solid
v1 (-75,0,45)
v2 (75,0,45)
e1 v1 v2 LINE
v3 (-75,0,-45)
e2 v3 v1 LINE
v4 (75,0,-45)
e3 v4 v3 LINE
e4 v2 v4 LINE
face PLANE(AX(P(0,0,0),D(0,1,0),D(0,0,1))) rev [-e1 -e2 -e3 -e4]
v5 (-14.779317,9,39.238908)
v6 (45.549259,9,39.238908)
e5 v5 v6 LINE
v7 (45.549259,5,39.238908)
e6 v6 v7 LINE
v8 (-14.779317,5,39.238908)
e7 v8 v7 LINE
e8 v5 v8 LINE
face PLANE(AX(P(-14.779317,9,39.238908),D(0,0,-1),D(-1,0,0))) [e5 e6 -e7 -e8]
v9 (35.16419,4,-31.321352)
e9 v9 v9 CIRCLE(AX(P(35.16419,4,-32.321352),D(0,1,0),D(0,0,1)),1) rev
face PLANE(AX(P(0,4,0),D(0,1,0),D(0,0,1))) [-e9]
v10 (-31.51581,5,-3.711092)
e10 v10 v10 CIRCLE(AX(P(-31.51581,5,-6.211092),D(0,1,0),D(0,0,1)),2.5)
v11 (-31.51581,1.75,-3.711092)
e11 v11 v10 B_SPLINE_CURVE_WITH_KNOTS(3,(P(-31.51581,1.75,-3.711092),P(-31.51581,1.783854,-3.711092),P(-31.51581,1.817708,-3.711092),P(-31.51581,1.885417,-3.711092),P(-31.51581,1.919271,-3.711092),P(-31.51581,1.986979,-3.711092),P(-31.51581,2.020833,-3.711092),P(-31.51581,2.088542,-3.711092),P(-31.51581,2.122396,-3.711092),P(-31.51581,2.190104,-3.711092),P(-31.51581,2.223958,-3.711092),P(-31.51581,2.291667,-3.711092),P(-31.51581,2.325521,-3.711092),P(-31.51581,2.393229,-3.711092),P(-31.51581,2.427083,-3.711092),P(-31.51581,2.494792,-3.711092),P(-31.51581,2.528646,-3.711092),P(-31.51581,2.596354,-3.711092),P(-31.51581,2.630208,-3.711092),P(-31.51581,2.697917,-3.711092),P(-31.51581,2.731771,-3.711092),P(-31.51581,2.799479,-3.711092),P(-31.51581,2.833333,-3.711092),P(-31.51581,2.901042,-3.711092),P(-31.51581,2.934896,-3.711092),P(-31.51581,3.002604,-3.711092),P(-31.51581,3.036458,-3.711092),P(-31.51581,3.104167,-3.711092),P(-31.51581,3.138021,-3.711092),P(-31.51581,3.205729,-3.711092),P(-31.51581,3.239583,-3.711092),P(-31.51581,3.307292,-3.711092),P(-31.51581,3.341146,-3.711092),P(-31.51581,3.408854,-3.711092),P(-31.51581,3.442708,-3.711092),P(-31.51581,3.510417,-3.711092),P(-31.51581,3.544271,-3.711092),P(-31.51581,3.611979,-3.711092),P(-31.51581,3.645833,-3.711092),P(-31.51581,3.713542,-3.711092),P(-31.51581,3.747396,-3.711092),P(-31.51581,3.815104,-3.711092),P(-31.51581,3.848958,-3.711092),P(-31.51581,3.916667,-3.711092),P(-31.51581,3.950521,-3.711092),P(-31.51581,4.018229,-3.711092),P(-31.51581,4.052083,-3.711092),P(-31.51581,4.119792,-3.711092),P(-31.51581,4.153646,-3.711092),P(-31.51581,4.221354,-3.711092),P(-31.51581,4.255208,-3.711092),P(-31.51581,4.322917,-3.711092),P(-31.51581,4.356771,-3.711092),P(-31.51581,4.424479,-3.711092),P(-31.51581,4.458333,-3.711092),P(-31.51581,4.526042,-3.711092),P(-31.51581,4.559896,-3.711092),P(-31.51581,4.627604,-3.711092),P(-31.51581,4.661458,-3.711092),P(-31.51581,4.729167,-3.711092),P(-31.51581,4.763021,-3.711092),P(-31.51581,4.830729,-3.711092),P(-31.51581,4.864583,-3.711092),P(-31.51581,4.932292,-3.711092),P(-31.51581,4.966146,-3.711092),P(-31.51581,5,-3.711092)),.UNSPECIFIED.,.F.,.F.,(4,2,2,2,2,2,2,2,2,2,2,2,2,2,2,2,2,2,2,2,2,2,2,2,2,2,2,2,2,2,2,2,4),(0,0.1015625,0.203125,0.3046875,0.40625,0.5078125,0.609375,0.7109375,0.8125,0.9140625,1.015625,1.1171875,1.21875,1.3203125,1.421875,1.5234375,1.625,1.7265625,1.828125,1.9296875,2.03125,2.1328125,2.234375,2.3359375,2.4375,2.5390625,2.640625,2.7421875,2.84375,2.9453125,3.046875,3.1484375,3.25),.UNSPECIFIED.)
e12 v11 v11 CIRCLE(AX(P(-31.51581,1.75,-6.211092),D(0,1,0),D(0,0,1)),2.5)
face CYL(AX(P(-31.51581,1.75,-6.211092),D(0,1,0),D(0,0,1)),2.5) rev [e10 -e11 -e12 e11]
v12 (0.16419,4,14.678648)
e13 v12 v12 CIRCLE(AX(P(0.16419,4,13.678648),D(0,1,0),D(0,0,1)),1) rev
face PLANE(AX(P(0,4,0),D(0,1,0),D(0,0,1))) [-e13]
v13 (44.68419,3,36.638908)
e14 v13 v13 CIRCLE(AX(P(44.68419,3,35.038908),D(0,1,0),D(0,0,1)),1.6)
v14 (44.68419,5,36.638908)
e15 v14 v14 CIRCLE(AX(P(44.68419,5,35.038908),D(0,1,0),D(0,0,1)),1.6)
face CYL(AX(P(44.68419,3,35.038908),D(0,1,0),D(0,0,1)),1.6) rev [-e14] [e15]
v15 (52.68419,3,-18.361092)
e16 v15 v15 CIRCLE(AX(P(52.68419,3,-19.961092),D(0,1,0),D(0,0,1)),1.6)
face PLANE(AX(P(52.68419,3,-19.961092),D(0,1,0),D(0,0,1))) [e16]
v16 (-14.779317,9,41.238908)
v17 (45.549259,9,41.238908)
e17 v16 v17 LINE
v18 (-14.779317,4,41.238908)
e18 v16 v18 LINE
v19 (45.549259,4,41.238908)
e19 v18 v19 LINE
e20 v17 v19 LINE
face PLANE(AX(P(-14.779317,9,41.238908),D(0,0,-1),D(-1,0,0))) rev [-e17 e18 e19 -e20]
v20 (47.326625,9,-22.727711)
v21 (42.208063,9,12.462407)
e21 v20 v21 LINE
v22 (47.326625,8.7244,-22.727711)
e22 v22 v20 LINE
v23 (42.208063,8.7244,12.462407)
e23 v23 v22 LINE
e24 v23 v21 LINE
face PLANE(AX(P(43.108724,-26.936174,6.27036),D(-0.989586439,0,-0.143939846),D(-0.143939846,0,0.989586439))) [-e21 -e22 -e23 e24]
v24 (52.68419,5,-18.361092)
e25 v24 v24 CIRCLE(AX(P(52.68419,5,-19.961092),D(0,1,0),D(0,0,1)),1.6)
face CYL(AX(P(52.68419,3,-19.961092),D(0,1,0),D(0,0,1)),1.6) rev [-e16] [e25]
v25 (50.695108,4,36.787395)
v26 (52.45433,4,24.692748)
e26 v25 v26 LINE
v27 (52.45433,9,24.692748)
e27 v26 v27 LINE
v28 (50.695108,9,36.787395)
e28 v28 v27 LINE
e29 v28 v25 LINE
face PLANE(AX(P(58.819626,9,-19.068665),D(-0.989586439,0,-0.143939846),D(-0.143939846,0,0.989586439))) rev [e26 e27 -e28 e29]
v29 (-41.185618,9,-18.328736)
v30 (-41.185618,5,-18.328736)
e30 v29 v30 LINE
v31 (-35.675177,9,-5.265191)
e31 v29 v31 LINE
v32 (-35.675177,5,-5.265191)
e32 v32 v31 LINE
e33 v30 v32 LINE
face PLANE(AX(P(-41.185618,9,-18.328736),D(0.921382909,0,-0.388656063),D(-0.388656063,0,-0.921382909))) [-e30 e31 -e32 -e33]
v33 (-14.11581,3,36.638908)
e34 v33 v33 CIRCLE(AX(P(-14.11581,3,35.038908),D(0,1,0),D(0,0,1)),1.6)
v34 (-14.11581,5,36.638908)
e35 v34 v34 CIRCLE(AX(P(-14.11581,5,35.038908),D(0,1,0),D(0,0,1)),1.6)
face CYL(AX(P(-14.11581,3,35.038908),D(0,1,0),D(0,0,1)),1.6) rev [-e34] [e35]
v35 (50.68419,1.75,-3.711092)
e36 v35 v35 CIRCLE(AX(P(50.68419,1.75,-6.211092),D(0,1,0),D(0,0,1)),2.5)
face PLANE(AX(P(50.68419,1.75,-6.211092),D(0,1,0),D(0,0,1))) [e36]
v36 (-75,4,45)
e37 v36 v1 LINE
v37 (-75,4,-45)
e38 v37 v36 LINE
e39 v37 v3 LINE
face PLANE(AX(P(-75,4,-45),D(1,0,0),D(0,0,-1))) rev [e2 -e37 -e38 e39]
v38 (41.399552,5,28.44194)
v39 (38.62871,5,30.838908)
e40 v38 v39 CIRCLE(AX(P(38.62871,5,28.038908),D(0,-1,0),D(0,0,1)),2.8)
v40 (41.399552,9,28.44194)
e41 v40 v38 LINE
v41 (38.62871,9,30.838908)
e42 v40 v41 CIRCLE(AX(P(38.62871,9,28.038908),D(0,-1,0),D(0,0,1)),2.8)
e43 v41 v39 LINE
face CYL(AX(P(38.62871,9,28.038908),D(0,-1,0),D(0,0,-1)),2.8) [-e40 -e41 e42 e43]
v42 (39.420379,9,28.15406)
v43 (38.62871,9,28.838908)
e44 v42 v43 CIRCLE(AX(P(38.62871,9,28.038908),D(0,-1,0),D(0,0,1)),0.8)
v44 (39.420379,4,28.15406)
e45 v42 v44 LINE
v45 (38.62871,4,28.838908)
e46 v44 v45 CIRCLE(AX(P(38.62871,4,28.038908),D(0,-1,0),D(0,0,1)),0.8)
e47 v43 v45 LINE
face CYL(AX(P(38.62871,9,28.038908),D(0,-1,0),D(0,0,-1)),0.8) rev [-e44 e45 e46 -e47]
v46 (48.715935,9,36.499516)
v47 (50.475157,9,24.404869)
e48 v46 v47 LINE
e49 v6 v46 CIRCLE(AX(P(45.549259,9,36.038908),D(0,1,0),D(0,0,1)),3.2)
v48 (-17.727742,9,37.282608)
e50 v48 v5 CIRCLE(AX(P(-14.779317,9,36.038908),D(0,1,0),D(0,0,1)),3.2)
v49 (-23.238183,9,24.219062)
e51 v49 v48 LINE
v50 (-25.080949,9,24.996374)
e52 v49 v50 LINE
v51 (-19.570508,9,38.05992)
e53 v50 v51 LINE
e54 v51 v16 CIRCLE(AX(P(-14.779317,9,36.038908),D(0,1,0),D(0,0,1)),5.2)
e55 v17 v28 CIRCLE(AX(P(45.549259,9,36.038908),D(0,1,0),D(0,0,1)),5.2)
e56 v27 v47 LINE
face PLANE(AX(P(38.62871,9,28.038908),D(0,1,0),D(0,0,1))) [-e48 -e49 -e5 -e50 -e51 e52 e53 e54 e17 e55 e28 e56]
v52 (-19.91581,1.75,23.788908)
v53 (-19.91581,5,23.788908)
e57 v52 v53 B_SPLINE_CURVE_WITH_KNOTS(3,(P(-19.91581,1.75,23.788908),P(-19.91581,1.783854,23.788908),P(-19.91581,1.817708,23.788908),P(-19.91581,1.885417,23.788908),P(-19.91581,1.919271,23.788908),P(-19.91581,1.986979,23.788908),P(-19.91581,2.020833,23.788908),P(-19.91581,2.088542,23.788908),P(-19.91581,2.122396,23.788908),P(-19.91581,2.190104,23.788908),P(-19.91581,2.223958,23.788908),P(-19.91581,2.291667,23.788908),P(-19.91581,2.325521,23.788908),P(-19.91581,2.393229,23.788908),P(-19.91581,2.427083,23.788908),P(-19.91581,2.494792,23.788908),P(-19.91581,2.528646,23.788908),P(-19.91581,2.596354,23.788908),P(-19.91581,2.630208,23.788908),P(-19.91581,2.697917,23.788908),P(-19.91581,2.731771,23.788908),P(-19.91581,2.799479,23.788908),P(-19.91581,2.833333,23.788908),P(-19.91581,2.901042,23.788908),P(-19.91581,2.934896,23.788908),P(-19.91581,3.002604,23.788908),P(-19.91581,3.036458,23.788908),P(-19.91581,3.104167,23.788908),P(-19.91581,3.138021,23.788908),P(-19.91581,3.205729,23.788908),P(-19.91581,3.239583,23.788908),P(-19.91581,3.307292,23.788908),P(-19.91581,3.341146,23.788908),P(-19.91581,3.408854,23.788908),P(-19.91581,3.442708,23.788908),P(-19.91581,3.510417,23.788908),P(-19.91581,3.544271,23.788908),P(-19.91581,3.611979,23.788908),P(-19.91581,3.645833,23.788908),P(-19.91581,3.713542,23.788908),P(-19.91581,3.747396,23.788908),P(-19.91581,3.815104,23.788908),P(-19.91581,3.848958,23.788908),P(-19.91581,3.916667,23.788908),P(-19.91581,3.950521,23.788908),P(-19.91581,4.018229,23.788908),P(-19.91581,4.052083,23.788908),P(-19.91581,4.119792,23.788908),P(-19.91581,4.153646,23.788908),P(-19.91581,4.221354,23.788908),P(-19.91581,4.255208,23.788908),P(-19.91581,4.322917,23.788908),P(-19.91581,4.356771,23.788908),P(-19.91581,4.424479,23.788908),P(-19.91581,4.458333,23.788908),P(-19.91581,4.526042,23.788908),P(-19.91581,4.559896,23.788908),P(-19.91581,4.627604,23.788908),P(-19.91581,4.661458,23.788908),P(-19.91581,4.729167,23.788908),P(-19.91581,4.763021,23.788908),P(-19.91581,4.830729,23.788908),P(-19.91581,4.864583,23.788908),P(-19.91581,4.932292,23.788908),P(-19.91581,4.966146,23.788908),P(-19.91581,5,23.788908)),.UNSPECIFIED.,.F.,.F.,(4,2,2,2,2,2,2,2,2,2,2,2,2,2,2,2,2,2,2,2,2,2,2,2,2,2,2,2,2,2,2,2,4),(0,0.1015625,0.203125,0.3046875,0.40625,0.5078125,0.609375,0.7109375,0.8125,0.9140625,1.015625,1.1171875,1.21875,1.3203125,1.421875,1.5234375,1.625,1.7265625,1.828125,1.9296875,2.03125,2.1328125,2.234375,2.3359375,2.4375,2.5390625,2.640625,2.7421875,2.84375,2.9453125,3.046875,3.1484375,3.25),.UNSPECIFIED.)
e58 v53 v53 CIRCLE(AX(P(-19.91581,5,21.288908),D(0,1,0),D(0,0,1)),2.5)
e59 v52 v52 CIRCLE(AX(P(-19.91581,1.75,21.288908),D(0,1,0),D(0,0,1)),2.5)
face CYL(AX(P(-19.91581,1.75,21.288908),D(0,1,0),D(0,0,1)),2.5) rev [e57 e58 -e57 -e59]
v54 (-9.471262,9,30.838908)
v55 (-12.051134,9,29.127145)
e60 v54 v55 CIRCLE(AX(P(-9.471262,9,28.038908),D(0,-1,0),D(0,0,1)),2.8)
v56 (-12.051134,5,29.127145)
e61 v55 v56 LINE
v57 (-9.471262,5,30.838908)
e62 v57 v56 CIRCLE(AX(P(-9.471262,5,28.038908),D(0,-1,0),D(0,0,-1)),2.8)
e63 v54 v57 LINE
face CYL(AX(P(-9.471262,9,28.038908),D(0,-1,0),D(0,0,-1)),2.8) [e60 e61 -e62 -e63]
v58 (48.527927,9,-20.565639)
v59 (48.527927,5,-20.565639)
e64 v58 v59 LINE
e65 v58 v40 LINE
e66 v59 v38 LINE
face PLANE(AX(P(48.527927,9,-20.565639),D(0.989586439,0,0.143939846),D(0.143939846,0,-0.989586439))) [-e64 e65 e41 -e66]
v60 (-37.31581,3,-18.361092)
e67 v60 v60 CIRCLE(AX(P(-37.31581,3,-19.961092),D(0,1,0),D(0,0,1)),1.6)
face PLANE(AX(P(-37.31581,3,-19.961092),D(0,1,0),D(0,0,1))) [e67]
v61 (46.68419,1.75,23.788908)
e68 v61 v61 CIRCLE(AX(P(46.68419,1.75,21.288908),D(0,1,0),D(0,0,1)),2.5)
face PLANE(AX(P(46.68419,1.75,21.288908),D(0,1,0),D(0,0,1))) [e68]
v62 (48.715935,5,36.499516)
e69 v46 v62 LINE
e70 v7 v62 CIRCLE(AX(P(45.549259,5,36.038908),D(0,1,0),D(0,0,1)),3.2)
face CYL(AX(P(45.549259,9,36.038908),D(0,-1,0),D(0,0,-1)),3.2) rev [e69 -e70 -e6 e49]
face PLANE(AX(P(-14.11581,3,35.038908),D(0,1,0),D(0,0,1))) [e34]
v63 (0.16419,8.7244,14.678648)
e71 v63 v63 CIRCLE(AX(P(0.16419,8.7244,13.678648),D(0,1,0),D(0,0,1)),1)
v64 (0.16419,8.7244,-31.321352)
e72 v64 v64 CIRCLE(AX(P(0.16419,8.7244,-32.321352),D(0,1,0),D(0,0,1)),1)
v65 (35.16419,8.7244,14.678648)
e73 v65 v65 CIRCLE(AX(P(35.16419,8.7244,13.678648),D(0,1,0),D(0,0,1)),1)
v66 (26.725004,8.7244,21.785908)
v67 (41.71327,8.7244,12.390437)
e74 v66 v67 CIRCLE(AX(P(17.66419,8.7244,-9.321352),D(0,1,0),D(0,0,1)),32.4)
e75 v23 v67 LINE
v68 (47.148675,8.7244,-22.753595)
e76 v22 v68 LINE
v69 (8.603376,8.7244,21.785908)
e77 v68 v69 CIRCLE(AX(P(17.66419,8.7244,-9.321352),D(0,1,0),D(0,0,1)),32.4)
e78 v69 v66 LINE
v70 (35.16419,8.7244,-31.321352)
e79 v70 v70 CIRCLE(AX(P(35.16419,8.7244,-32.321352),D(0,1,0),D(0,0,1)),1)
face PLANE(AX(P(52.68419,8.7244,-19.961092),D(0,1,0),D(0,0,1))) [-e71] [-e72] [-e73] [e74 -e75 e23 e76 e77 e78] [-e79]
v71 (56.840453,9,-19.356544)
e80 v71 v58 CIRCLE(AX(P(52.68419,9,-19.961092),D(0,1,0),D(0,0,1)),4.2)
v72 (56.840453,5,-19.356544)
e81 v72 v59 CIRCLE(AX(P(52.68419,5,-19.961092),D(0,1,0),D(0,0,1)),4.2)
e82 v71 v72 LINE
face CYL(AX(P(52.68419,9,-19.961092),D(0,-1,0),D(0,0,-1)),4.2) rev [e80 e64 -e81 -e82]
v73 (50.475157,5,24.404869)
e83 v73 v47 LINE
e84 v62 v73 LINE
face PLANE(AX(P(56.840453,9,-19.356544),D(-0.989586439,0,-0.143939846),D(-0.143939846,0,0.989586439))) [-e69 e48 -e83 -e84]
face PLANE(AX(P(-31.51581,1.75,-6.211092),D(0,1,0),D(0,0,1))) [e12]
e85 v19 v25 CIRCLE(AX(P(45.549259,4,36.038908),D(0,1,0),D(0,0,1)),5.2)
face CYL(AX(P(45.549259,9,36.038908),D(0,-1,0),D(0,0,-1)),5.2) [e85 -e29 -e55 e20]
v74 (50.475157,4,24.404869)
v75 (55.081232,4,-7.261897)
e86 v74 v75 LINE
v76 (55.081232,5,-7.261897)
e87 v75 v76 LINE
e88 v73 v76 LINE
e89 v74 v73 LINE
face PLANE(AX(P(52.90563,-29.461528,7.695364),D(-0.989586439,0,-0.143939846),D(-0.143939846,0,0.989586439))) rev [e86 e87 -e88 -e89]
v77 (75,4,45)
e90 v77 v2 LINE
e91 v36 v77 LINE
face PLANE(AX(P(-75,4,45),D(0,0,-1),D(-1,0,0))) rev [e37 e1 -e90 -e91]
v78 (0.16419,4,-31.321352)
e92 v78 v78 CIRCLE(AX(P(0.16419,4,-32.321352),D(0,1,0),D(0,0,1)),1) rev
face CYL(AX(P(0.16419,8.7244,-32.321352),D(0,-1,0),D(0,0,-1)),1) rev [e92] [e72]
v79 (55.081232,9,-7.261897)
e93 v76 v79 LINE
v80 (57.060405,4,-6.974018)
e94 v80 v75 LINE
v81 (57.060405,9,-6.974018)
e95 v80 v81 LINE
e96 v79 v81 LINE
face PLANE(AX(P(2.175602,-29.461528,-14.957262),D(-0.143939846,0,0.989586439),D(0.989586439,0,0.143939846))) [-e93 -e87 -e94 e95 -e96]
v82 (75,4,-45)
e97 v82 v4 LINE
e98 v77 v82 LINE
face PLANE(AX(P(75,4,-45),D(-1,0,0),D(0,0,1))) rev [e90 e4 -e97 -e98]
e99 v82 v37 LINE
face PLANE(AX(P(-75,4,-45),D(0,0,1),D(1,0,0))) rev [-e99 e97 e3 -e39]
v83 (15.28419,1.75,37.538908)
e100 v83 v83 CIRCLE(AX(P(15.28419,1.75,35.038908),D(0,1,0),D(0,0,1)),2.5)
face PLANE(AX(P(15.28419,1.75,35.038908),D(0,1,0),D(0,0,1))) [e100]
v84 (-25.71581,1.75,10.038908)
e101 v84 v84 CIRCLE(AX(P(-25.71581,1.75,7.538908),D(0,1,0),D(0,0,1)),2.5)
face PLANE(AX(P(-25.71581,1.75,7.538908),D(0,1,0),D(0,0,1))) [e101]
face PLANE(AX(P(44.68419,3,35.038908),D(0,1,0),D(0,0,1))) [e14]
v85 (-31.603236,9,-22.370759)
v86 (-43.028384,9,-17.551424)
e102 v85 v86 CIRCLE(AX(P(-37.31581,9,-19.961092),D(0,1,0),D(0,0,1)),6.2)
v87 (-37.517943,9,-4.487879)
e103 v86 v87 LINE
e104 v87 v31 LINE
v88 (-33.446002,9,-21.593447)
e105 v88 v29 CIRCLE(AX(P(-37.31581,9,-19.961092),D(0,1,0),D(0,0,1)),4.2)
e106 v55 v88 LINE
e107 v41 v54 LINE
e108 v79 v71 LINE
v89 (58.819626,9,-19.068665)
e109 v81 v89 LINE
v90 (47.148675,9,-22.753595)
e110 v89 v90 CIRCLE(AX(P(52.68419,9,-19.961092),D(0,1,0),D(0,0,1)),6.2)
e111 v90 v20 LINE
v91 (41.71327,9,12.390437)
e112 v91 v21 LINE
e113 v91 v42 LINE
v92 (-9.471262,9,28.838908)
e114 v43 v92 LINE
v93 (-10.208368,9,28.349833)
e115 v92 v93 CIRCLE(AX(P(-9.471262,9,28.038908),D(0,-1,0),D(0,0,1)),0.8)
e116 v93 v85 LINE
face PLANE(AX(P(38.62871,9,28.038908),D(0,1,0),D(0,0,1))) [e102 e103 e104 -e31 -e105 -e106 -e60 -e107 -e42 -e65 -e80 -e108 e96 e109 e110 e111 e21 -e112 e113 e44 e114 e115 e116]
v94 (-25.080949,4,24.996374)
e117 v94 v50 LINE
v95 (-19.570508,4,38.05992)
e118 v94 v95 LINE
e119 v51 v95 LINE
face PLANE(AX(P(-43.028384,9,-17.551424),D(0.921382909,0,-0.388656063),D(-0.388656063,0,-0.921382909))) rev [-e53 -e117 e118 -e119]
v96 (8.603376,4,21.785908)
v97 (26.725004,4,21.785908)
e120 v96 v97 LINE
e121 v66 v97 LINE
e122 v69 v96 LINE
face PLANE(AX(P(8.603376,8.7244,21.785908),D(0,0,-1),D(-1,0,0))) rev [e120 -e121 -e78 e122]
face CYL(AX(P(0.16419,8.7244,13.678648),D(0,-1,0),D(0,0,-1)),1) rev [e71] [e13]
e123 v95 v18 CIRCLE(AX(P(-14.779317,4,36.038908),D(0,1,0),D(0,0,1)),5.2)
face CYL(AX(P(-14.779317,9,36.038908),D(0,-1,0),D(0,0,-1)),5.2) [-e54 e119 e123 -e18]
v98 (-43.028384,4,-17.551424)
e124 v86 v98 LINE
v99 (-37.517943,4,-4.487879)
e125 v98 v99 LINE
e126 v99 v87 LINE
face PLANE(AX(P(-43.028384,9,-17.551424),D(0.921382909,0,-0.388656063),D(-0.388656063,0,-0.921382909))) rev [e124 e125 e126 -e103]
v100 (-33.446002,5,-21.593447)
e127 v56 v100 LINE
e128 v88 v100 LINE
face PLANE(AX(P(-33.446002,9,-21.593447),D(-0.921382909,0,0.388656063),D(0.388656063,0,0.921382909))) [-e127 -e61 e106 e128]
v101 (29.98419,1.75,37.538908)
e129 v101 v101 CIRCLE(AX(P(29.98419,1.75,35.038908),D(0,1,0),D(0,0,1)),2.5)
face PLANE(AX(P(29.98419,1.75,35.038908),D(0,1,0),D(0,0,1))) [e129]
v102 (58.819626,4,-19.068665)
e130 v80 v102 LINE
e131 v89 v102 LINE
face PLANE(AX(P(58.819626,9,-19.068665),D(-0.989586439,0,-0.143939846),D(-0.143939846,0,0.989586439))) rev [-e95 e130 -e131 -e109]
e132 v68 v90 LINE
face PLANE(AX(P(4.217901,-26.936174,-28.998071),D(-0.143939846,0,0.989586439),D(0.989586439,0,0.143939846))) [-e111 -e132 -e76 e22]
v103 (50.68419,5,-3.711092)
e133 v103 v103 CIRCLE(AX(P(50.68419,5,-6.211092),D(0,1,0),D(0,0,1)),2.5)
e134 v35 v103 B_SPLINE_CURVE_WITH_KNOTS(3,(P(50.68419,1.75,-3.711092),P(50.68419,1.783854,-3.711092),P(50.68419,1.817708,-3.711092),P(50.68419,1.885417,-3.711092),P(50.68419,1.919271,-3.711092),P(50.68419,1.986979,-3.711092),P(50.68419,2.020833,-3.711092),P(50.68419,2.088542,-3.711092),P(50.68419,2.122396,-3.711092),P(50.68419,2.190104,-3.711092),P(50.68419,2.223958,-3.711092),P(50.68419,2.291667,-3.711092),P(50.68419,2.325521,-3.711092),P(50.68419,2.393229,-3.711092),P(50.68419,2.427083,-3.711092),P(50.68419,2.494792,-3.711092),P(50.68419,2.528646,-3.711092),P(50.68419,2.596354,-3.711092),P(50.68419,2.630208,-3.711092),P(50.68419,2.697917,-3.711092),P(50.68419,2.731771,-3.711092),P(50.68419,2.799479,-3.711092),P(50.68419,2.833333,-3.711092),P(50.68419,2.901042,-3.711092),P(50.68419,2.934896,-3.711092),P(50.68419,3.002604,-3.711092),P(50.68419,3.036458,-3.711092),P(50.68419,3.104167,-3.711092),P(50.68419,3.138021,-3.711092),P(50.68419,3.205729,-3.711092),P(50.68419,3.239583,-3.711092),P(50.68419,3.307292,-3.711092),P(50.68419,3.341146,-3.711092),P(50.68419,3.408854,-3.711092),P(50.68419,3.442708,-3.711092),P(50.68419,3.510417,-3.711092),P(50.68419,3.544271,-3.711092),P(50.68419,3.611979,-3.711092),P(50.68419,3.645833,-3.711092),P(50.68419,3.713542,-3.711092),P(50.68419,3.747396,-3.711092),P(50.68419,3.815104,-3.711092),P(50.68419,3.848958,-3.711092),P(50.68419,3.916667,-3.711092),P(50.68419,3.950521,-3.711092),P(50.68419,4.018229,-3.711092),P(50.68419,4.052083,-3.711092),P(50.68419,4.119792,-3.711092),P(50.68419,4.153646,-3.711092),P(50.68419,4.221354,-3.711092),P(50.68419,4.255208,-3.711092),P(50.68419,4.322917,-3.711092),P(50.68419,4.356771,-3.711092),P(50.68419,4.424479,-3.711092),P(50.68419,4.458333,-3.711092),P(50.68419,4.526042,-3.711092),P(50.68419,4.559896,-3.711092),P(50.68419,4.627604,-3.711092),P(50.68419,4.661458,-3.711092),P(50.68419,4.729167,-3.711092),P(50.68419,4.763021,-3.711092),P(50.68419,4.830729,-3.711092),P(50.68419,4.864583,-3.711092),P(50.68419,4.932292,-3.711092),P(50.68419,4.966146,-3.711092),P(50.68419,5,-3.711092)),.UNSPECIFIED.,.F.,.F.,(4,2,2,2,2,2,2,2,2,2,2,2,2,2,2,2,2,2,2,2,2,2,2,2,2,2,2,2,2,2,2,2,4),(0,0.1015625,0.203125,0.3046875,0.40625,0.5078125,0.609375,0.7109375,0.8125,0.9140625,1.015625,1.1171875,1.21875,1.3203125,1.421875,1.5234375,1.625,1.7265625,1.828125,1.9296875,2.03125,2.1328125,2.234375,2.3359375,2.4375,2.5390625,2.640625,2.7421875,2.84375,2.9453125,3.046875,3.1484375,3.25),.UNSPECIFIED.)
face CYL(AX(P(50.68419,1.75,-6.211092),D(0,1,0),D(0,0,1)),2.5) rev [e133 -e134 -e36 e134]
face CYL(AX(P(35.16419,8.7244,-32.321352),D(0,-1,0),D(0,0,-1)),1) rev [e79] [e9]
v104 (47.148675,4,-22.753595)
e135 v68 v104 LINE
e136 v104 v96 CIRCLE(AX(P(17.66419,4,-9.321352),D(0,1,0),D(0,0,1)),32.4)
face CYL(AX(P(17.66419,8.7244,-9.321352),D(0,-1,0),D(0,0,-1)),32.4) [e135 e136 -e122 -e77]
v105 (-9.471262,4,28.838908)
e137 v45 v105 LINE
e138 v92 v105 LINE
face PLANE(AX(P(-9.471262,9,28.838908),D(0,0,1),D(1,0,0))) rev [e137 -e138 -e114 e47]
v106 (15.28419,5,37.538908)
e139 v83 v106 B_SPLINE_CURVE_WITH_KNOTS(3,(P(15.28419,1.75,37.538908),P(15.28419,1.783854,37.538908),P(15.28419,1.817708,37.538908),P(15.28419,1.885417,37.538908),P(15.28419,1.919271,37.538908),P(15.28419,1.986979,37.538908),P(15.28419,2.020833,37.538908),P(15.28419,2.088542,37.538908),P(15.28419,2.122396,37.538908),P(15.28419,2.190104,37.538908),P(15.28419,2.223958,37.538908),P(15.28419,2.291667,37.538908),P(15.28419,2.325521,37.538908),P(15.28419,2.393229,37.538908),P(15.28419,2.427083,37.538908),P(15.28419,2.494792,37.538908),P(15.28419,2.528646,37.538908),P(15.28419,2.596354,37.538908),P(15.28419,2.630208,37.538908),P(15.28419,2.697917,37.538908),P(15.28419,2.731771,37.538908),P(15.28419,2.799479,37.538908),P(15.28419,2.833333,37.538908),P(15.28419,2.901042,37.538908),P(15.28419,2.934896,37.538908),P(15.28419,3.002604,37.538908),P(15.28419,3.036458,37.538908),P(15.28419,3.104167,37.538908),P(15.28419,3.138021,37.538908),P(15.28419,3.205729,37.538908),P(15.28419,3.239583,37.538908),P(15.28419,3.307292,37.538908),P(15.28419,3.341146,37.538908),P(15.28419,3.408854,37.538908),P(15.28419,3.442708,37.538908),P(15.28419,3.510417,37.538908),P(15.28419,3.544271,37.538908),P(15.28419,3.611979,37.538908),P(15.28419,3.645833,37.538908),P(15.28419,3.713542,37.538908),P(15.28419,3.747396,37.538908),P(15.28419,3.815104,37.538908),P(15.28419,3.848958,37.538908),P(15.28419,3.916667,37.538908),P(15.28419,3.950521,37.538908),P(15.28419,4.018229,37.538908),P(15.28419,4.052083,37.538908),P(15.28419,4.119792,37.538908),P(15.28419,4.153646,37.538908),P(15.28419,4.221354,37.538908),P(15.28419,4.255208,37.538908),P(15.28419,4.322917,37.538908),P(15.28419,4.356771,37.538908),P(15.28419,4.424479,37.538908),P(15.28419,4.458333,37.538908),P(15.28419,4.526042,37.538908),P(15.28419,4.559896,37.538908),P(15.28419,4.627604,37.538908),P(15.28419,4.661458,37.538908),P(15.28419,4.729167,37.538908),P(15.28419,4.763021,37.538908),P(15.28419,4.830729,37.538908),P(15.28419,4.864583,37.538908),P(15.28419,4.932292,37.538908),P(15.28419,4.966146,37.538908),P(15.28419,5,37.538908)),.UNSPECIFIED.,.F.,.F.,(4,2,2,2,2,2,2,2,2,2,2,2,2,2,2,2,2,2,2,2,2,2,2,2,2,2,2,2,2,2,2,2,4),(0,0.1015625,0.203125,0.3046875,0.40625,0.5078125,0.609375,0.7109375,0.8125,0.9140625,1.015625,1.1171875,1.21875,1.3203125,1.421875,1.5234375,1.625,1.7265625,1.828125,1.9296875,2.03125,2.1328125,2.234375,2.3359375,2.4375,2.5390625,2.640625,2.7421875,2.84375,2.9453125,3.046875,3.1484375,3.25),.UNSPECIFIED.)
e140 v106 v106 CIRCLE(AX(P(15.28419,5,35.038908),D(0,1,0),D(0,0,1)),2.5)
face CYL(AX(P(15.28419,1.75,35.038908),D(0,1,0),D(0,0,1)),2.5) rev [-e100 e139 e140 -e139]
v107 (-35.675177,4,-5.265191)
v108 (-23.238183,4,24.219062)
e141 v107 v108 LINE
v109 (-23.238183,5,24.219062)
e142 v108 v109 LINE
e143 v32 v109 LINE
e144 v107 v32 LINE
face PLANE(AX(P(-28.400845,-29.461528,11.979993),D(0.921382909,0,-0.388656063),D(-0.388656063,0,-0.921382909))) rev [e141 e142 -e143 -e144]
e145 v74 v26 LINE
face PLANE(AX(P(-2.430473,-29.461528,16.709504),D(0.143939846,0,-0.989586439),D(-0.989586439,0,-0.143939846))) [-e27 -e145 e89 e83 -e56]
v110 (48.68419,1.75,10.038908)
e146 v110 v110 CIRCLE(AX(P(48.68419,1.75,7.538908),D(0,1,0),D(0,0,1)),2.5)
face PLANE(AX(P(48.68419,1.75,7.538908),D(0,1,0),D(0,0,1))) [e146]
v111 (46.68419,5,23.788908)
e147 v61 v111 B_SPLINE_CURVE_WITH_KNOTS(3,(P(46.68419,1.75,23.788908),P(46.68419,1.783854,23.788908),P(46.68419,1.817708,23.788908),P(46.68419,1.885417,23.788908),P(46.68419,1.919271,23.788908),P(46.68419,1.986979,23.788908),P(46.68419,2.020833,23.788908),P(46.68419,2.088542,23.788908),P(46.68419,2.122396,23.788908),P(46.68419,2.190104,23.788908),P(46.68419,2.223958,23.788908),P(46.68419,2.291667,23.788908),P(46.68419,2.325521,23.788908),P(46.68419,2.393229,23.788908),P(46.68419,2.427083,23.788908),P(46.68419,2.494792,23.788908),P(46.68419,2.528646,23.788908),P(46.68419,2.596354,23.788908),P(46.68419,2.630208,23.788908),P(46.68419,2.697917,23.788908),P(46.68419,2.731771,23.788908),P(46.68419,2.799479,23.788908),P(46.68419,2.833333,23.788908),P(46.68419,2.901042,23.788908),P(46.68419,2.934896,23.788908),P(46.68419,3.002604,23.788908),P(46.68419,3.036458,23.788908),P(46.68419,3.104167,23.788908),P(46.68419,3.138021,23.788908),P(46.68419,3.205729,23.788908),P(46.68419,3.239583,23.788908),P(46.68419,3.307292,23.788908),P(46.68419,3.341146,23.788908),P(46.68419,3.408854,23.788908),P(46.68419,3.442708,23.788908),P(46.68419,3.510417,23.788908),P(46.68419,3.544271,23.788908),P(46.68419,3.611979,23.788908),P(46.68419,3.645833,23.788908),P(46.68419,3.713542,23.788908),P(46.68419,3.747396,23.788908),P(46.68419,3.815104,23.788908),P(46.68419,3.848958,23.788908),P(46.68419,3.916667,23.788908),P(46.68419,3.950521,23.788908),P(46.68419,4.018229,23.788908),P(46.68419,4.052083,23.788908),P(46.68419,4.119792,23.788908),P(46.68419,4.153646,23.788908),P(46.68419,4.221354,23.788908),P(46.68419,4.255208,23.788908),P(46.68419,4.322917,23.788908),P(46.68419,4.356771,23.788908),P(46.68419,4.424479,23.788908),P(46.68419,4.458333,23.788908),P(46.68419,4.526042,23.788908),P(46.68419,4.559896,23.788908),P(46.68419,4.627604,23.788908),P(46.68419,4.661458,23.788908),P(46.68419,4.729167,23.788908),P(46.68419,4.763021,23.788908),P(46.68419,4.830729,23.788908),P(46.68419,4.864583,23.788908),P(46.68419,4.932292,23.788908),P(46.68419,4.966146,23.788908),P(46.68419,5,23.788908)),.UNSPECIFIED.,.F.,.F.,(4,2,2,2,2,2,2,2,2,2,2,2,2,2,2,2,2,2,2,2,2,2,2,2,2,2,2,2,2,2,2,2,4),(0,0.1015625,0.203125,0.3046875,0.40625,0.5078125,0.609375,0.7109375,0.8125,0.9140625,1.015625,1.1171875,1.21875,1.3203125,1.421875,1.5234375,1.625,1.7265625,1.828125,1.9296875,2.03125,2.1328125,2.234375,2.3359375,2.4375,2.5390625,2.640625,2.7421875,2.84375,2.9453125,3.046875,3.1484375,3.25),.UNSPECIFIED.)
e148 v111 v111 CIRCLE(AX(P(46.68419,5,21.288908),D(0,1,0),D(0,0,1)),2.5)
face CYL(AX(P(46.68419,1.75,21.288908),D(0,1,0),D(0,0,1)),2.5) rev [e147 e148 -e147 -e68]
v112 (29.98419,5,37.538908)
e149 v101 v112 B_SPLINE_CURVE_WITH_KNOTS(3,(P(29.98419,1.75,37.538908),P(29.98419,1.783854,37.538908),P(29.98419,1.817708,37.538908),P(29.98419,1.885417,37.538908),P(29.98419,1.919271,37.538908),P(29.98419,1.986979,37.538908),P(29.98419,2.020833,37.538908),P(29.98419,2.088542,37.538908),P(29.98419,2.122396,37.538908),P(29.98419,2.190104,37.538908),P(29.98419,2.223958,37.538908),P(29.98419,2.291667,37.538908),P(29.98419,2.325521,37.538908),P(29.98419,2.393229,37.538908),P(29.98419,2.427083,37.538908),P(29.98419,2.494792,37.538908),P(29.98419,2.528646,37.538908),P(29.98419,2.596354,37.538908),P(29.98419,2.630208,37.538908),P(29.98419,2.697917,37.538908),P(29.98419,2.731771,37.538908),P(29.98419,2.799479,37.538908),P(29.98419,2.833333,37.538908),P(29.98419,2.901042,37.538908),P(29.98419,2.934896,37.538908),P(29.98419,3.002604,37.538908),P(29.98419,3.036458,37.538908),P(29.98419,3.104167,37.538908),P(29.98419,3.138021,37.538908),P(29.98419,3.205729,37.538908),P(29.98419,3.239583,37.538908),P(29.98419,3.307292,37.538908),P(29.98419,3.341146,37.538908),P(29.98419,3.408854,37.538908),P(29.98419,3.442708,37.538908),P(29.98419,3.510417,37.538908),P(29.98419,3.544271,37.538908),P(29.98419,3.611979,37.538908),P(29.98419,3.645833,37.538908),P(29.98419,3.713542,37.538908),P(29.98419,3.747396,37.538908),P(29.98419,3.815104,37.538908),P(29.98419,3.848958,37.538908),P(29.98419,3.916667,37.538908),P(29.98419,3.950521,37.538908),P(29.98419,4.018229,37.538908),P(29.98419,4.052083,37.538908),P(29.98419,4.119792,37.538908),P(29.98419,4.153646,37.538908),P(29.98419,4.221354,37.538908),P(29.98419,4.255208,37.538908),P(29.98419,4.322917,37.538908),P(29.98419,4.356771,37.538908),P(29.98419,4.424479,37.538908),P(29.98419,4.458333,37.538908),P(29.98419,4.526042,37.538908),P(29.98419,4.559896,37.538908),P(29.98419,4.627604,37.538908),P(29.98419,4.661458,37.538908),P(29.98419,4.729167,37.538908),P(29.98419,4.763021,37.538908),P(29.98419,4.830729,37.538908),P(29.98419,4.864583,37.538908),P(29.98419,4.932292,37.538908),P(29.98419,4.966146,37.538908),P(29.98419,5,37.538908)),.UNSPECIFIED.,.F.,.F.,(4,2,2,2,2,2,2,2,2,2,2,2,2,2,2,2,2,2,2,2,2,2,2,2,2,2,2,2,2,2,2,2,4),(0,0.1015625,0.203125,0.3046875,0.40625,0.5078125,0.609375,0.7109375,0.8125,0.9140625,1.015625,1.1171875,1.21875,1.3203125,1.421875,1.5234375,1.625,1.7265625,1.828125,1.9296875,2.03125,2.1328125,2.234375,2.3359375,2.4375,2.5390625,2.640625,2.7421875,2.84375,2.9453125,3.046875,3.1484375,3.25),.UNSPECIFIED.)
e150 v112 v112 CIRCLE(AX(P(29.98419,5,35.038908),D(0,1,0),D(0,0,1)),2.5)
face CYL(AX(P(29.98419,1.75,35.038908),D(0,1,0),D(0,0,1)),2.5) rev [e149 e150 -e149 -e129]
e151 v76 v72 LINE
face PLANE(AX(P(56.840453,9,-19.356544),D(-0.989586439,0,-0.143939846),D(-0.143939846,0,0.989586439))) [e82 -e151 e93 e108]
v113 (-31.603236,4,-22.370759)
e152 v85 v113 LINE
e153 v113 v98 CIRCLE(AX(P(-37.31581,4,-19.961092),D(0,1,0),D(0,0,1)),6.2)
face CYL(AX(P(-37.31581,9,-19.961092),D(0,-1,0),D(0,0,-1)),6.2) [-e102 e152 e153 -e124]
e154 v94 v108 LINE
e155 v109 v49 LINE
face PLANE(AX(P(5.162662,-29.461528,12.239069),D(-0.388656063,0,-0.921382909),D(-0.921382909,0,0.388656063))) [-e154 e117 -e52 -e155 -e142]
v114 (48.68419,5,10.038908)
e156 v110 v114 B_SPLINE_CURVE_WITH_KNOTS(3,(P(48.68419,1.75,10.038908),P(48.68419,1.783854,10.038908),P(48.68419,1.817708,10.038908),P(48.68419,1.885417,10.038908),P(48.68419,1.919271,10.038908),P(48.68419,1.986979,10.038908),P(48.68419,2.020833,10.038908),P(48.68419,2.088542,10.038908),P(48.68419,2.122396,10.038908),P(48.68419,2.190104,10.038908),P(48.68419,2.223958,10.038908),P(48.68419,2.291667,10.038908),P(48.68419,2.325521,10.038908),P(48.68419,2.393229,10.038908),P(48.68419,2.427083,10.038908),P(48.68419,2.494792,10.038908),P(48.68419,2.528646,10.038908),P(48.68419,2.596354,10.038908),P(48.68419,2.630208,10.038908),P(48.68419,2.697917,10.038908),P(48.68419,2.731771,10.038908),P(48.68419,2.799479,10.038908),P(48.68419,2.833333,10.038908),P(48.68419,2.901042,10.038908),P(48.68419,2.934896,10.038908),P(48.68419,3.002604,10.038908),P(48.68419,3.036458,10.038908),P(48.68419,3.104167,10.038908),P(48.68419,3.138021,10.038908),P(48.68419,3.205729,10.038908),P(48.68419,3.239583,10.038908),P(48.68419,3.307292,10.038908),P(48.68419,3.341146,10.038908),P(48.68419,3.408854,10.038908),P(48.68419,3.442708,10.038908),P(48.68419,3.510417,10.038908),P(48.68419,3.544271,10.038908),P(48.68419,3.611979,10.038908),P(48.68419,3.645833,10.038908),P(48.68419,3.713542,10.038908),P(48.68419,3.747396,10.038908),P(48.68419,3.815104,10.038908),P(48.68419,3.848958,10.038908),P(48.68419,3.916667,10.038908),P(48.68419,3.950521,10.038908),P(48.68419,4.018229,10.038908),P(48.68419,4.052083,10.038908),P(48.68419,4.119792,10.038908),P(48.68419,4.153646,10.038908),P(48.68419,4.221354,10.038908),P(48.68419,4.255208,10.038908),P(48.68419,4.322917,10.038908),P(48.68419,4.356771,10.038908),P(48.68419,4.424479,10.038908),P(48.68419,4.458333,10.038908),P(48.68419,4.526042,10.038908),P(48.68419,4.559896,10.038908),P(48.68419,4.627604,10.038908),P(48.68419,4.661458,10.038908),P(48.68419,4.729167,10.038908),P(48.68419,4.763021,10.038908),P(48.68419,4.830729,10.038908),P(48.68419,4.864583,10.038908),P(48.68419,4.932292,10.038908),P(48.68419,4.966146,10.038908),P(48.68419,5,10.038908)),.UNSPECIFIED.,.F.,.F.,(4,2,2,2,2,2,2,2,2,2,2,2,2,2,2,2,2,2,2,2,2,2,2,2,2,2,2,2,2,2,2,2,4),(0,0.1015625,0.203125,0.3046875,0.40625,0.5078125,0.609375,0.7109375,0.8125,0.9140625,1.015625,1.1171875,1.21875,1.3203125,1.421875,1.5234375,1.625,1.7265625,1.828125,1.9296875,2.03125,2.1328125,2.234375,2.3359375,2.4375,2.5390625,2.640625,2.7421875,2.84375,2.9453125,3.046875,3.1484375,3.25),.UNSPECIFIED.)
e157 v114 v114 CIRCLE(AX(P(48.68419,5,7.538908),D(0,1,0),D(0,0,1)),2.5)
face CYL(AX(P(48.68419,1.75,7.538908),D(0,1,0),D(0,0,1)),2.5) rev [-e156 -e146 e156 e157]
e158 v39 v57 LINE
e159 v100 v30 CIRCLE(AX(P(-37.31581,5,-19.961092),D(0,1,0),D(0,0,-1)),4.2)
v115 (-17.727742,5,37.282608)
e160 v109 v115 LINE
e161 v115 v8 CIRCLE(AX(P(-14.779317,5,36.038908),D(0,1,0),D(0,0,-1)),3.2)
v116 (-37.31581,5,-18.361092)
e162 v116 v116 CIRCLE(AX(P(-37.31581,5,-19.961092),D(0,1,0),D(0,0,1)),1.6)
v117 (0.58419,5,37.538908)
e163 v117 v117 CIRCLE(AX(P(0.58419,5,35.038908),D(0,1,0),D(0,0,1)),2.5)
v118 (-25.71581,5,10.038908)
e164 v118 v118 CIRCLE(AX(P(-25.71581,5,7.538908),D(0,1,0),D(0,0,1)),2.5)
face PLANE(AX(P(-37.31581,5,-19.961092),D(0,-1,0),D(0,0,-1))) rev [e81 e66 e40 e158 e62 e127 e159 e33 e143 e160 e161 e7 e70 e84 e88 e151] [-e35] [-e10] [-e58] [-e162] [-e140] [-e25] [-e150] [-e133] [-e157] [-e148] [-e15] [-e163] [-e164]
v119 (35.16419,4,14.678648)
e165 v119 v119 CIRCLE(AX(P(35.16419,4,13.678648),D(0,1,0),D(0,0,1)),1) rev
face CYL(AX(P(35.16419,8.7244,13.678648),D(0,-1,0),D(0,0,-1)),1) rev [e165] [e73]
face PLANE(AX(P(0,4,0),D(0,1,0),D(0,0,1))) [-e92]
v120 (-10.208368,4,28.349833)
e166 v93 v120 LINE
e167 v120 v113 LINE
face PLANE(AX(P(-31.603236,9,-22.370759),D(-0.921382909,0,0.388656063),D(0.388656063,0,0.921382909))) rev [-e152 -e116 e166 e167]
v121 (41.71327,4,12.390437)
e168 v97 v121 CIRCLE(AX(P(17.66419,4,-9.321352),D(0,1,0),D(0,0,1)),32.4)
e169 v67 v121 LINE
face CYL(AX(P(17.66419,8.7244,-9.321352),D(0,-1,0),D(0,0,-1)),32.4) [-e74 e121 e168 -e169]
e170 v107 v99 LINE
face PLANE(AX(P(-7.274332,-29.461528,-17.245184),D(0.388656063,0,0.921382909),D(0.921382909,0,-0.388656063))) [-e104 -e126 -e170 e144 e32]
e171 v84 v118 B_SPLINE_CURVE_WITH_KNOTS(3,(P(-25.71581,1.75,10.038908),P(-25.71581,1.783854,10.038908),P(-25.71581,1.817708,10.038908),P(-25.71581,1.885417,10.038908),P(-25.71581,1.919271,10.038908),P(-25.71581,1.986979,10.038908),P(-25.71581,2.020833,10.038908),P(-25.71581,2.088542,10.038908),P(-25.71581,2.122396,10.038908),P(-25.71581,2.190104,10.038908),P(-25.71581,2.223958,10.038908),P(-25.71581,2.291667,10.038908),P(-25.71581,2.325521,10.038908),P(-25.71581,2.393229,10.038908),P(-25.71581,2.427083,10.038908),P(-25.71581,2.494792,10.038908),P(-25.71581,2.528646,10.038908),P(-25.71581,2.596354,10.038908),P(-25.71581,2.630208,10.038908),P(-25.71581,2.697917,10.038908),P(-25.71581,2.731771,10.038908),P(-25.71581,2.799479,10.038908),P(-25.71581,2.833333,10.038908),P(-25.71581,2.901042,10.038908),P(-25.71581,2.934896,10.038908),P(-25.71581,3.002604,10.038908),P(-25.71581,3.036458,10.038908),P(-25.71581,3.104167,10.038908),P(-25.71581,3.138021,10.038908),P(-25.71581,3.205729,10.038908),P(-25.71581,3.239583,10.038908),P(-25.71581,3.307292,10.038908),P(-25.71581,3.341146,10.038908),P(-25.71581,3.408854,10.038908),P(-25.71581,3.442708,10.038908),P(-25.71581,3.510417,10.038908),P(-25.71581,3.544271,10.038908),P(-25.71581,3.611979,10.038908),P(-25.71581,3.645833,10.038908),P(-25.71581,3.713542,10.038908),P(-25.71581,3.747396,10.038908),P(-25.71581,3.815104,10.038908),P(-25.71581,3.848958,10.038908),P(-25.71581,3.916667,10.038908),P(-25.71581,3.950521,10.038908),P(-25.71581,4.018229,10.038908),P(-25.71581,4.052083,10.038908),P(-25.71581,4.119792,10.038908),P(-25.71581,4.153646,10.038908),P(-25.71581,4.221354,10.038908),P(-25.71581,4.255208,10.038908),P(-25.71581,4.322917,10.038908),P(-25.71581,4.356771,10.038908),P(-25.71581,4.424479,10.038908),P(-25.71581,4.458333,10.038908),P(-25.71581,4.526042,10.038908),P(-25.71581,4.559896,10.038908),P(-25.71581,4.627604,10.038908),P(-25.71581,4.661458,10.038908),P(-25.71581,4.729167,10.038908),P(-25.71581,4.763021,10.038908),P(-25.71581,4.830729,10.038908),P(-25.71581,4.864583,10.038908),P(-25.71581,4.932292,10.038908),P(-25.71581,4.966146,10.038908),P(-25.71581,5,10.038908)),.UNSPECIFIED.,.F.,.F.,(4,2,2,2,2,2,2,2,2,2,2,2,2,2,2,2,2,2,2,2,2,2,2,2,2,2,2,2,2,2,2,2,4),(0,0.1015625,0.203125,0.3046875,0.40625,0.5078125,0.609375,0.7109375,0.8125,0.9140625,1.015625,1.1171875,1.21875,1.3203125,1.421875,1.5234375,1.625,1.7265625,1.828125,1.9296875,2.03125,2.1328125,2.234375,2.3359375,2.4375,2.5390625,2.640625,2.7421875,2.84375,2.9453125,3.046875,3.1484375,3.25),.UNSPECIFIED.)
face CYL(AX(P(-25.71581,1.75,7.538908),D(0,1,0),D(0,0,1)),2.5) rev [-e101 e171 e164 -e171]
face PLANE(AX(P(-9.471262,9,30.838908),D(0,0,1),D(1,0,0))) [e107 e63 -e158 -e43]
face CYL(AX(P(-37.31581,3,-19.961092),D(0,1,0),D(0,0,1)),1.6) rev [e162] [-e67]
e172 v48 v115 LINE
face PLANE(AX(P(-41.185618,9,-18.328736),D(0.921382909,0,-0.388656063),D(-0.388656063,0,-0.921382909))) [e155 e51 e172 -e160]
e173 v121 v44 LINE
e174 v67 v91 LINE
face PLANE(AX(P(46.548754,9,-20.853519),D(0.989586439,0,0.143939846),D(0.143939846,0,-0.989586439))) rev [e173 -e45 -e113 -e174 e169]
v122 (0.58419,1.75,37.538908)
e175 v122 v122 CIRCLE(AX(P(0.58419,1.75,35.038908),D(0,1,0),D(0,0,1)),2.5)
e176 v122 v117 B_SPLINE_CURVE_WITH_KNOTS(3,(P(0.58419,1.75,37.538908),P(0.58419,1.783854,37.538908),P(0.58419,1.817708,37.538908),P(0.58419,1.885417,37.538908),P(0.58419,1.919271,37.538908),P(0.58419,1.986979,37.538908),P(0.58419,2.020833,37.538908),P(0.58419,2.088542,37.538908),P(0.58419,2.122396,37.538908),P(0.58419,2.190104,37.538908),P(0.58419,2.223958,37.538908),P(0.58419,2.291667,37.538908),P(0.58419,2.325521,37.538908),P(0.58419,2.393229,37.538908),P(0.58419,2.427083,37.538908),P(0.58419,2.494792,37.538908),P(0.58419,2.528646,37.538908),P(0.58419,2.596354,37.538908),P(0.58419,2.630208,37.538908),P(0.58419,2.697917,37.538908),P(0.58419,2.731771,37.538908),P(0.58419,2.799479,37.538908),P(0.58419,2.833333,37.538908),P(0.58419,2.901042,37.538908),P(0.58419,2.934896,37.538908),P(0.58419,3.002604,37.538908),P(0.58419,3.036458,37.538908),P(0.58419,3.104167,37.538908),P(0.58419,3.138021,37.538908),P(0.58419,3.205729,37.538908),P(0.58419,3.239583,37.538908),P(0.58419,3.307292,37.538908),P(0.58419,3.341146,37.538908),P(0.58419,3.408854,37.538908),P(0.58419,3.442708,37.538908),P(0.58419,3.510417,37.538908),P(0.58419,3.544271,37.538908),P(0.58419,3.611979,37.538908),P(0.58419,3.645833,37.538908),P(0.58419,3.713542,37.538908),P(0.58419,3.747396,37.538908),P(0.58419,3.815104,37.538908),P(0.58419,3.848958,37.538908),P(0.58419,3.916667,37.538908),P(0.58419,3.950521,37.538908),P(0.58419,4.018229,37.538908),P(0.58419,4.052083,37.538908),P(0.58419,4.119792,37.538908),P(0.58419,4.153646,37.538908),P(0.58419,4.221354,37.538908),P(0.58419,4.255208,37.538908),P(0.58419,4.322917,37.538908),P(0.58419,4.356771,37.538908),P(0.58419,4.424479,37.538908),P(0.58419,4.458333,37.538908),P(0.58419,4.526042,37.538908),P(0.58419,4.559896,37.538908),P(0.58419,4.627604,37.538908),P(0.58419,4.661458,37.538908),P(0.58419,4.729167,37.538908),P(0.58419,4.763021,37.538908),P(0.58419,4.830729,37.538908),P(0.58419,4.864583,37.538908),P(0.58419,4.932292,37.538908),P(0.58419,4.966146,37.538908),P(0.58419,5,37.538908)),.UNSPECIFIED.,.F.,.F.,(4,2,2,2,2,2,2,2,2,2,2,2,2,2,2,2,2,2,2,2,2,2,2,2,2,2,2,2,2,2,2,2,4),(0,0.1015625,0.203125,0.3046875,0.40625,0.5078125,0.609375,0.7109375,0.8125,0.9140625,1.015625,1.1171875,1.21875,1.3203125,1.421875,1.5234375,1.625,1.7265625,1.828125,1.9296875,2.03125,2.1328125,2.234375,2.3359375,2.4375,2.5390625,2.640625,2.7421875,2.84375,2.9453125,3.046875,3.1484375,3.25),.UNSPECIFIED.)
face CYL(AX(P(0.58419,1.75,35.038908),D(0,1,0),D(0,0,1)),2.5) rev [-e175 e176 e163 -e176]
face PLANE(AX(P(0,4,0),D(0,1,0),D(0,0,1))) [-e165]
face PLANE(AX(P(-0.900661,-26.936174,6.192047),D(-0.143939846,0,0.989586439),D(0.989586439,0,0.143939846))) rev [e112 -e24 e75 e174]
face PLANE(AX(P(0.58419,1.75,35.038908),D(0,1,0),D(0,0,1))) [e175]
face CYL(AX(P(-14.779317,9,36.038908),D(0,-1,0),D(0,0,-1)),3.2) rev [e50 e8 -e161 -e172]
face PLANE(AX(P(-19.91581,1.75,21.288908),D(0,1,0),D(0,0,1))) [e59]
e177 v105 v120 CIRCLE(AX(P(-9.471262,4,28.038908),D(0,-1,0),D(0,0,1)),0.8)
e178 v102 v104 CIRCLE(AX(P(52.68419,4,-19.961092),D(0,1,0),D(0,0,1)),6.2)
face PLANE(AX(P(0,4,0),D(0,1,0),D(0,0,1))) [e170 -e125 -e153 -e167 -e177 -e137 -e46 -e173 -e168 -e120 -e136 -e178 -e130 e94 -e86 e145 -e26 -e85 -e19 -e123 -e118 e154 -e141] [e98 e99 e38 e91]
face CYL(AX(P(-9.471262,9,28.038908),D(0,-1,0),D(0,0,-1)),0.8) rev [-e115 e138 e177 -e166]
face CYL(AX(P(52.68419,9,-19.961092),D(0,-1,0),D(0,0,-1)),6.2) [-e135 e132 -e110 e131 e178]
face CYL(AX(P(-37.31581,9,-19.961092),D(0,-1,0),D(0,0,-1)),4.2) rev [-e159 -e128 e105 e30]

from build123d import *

# Parameters (mm, degrees)
SKETCH1_W           = 150
SKETCH1_H           = 90
BOSS_EXTRUDE1_DEPTH = 4
BOSS_EXTRUDE3_START = 4
BOSS_EXTRUDE3_DEPTH = 1
SKETCH3_R           = 1.6
CUT_EXTRUDE3_DEPTH  = 2
SKETCH5_R           = 2.5
CUT_EXTRUDE4_DEPTH  = 3.25
BOSS_EXTRUDE2_DEPTH = 5
CUT_EXTRUDE5_REACH  = 89.926
SKETCH10_R          = 1
BOSS_EXTRUDE4_DEPTH = 4.7244
CUT_EXTRUDE6_DEPTH  = 0.2756


# Read off the part's stored shape, not the designer's step: Boss-Extrude3
with BuildPart() as part:
    # Sketch1 → Boss-Extrude1 (new body)
    with BuildSketch(Plane(origin=(0, 0, 0), x_dir=(1, 0, 0), z_dir=(0, 1, 0))):
        Rectangle(SKETCH1_W, SKETCH1_H)
    extrude(amount=BOSS_EXTRUDE1_DEPTH)

    # Boss-Extrude3 outline → Boss-Extrude3 (add)
    with BuildSketch(Plane(origin=(0, 0, 0), x_dir=(1, 0, 0), z_dir=(0, 1, 0)).offset(BOSS_EXTRUDE3_START)):
        with BuildLine():
            ThreePointArc((-33.446001745, 21.59344723), (-38.948165427, 23.830899981), (-41.185618178, 18.328736299))
            Line((-41.185618178, 18.328736299), (-17.72774219, -37.282607638))
            ThreePointArc((-17.72774219, -37.282607638), (-16.548520363, -38.70535138), (-14.779316882, -39.238908236))
            Line((-14.779316882, -39.238908236), (45.549258637, -39.238908236))
            ThreePointArc((45.549258637, -39.238908236), (47.642826881, -38.459026417), (48.715935243, -36.499515742))
            Line((48.715935243, -36.499515742), (56.840453083, 19.356544412))
            ThreePointArc((56.840453083, 19.356544412), (53.28873739, 24.117354809), (48.527926993, 20.565639116))
            Line((48.527926993, 20.565639116), (41.399551878, -28.441939804))
            ThreePointArc((41.399551878, -28.441939804), (40.460582061, -30.156511644), (38.628709848, -30.838908236))
            Line((38.628709848, -30.838908236), (-9.471261516, -30.838908236))
            ThreePointArc((-9.471261516, -30.838908236), (-11.019314561, -30.372045987), (-12.05113366, -29.127145213))
            Line((-12.05113366, -29.127145213), (-33.446001745, 21.59344723))
        make_face()
    extrude(amount=BOSS_EXTRUDE3_DEPTH)

    # Sketch3 → Cut-Extrude3 (cut)
    with BuildSketch(Plane(origin=(0, 5, 0), x_dir=(1, 0, 0), z_dir=(0, 1, 0))):
        with Locations(Location((-37.315809962, 19.961091764, 0), (0, 0, 270))):
            Circle(SKETCH3_R)
        with Locations(Location((-14.115809962, -35.038908236, 0), (0, 0, 270))):
            Circle(SKETCH3_R)
        with Locations(Location((44.684190038, -35.038908236, 0), (0, 0, 270))):
            Circle(SKETCH3_R)
        with Locations(Location((52.684190038, 19.961091764, 0), (0, 0, 270))):
            Circle(SKETCH3_R)
    extrude(amount=-CUT_EXTRUDE3_DEPTH, mode=Mode.SUBTRACT)

    # Sketch5 → Cut-Extrude4 (cut)
    with BuildSketch(Plane(origin=(0, 5, 0), x_dir=(1, 0, 0), z_dir=(0, 1, 0))):
        with Locations(Location((-31.515809962, 6.211091764, 0), (0, 0, 270))):
            Circle(SKETCH5_R)
        with Locations(Location((15.284190038, -35.038908236, 0), (0, 0, 270))):
            Circle(SKETCH5_R)
        with Locations(Location((46.684190038, -21.288908236, 0), (0, 0, 270))):
            Circle(SKETCH5_R)
        with Locations(Location((-19.915809962, -21.288908236, 0), (0, 0, 270))):
            Circle(SKETCH5_R)
        with Locations(Location((50.684190038, 6.211091764, 0), (0, 0, 270))):
            Circle(SKETCH5_R)
        with Locations(Location((-25.715809962, -7.538908236, 0), (0, 0, 270))):
            Circle(SKETCH5_R)
        with Locations(Location((0.584190038, -35.038908236, 0), (0, 0, 270))):
            Circle(SKETCH5_R)
        with Locations(Location((29.984190038, -35.038908236, 0), (0, 0, 270))):
            Circle(SKETCH5_R)
        with Locations(Location((48.684190038, -7.538908236, 0), (0, 0, 270))):
            Circle(SKETCH5_R)
    extrude(amount=-CUT_EXTRUDE4_DEPTH, mode=Mode.SUBTRACT)

    # Sketch6 → Boss-Extrude2 (add)
    with BuildSketch(Plane(origin=(0, 4, 0), x_dir=(1, 0, 0), z_dir=(0, 1, 0))):
        with BuildLine():
            Line((46.548754115, 20.853518808), (39.420378999, -28.154060112))
            ThreePointArc((39.420378999, -28.154060112), (39.152101909, -28.643937781), (38.628709848, -28.838908236))
            Line((38.628709848, -28.838908236), (-9.471261516, -28.838908236))
            ThreePointArc((-9.471261516, -28.838908236), (-9.913562386, -28.705519022), (-10.208367842, -28.349833086))
            Line((-10.208367842, -28.349833086), (-31.603235928, 22.370759357))
            ThreePointArc((-31.603235928, 22.370759357), (-39.725477554, 25.673665798), (-43.028383996, 17.551424172))
            Line((-43.028383996, 17.551424172), (-19.570508008, -38.059919765))
            ThreePointArc((-19.570508008, -38.059919765), (-17.654272538, -40.371878346), (-14.779316882, -41.238908236))
            Line((-14.779316882, -41.238908236), (45.549258637, -41.238908236))
            ThreePointArc((45.549258637, -41.238908236), (48.951307033, -39.97160028), (50.695108121, -36.787395433))
            Line((50.695108121, -36.787395433), (58.819625962, 19.068664721))
            ThreePointArc((58.819625962, 19.068664721), (53.576617082, 26.096527688), (46.548754115, 20.853518808))
        make_face()
        with BuildLine():
            Line((-9.471261516, -30.838908236), (38.628709848, -30.838908236))
            ThreePointArc((38.628709848, -30.838908236), (40.460582061, -30.156511644), (41.399551878, -28.441939804))
            Line((41.399551878, -28.441939804), (48.527926993, 20.565639116))
            ThreePointArc((48.527926993, 20.565639116), (53.28873739, 24.117354809), (56.840453083, 19.356544412))
            Line((56.840453083, 19.356544412), (48.715935243, -36.499515742))
            ThreePointArc((48.715935243, -36.499515742), (47.642826881, -38.459026417), (45.549258637, -39.238908236))
            Line((45.549258637, -39.238908236), (-14.779316882, -39.238908236))
            ThreePointArc((-14.779316882, -39.238908236), (-16.548520363, -38.70535138), (-17.72774219, -37.282607638))
            Line((-17.72774219, -37.282607638), (-41.185618178, 18.328736299))
            ThreePointArc((-41.185618178, 18.328736299), (-38.948165427, 23.830899981), (-33.446001745, 21.59344723))
            Line((-33.446001745, 21.59344723), (-12.05113366, -29.127145213))
            ThreePointArc((-12.05113366, -29.127145213), (-11.019314561, -30.372045987), (-9.471261516, -30.838908236))
        make_face(mode=Mode.SUBTRACT)
    extrude(amount=BOSS_EXTRUDE2_DEPTH)

    # Cut-Extrude5: up to this face of the body (flat: up to its plane)
    cut_extrude5_end = Plane(part.part.faces().sort_by_distance((-2.356631327, 4, -3.006871304))[0])
    # Sketch9 → Cut-Extrude5 (cut, up to the picked face)
    with BuildSketch(Plane(origin=(0, 9, 0), x_dir=(1, 0, 0), z_dir=(0, 1, 0)), mode=Mode.PRIVATE) as cut_extrude5_sk1:
        Polygon((-23.238183171, -24.219062209), (-35.675177197, 5.26519087), (-37.517943015, 4.487878743), (-25.080948989, -24.996374336), align=None)
    cut_extrude5_tool1 = split(extrude(cut_extrude5_sk1.sketch, amount=-CUT_EXTRUDE5_REACH, mode=Mode.PRIVATE), bisect_by=cut_extrude5_end, keep=Keep.BOTH, mode=Mode.PRIVATE)
    # Sketch9 → Cut-Extrude5 (cut, up to the picked face)
    with BuildSketch(Plane(origin=(0, 9, 0), x_dir=(1, 0, 0), z_dir=(0, 1, 0)), mode=Mode.PRIVATE) as cut_extrude5_sk2:
        Polygon((55.081231695, 7.261897364), (50.475156632, -24.404868693), (52.45432951, -24.692748385), (57.060404573, 6.974017672), align=None)
    cut_extrude5_tool2 = split(extrude(cut_extrude5_sk2.sketch, amount=-CUT_EXTRUDE5_REACH, mode=Mode.PRIVATE), bisect_by=cut_extrude5_end, keep=Keep.BOTH, mode=Mode.PRIVATE)
    add(cut_extrude5_tool1.solids().sort_by(Axis((-30.378063, 9, 9.865592), (0, -1, 0)))[0], mode=Mode.SUBTRACT)
    add(cut_extrude5_tool2.solids().sort_by(Axis((53.767781, 9, 8.715426), (0, -1, 0)))[0], mode=Mode.SUBTRACT)

    # Sketch10 → Boss-Extrude4 (add)
    with BuildSketch(Plane(origin=(0, 4, 0), x_dir=(1, 0, 0), z_dir=(0, 1, 0))):
        with BuildLine():
            Line((8.603375751, -21.785908236), (26.725004326, -21.785908236))
            ThreePointArc((26.725004326, -21.785908236), (34.872763222, -18.130879321), (41.713269692, -12.390436602))
            Line((41.713269692, -12.390436602), (46.548754115, 20.853518808))
            ThreePointArc((46.548754115, 20.853518808), (46.771885392, 21.8278145), (47.148675016, 22.753594842))
            ThreePointArc((47.148675016, 22.753594842), (-6.835267399, 30.523629914), (8.603375751, -21.785908236))
        make_face()
        with Locations(Location((0.164190038, 32.321352082, 0), (0, 0, 270))):
            Circle(SKETCH10_R, mode=Mode.SUBTRACT)
        with Locations(Location((0.164190038, -13.678647918, 0), (0, 0, 270))):
            Circle(SKETCH10_R, mode=Mode.SUBTRACT)
        with Locations(Location((35.164190038, -13.678647918, 0), (0, 0, 270))):
            Circle(SKETCH10_R, mode=Mode.SUBTRACT)
        with Locations(Location((35.164190038, 32.321352082, 0), (0, 0, 270))):
            Circle(SKETCH10_R, mode=Mode.SUBTRACT)
    extrude(amount=BOSS_EXTRUDE4_DEPTH)

    # Sketch11 → Cut-Extrude6 (cut)
    with BuildSketch(Plane(origin=(0, 9, 0), x_dir=(1, 0, 0), z_dir=(0, 1, 0))):
        Polygon((41.713269692, -12.390436602), (46.831832261, 22.799681061), (47.32662548, 22.727711139), (42.208062911, -12.462406525), align=None)
    extrude(amount=-CUT_EXTRUDE6_DEPTH, mode=Mode.SUBTRACT)


solid = part.part
